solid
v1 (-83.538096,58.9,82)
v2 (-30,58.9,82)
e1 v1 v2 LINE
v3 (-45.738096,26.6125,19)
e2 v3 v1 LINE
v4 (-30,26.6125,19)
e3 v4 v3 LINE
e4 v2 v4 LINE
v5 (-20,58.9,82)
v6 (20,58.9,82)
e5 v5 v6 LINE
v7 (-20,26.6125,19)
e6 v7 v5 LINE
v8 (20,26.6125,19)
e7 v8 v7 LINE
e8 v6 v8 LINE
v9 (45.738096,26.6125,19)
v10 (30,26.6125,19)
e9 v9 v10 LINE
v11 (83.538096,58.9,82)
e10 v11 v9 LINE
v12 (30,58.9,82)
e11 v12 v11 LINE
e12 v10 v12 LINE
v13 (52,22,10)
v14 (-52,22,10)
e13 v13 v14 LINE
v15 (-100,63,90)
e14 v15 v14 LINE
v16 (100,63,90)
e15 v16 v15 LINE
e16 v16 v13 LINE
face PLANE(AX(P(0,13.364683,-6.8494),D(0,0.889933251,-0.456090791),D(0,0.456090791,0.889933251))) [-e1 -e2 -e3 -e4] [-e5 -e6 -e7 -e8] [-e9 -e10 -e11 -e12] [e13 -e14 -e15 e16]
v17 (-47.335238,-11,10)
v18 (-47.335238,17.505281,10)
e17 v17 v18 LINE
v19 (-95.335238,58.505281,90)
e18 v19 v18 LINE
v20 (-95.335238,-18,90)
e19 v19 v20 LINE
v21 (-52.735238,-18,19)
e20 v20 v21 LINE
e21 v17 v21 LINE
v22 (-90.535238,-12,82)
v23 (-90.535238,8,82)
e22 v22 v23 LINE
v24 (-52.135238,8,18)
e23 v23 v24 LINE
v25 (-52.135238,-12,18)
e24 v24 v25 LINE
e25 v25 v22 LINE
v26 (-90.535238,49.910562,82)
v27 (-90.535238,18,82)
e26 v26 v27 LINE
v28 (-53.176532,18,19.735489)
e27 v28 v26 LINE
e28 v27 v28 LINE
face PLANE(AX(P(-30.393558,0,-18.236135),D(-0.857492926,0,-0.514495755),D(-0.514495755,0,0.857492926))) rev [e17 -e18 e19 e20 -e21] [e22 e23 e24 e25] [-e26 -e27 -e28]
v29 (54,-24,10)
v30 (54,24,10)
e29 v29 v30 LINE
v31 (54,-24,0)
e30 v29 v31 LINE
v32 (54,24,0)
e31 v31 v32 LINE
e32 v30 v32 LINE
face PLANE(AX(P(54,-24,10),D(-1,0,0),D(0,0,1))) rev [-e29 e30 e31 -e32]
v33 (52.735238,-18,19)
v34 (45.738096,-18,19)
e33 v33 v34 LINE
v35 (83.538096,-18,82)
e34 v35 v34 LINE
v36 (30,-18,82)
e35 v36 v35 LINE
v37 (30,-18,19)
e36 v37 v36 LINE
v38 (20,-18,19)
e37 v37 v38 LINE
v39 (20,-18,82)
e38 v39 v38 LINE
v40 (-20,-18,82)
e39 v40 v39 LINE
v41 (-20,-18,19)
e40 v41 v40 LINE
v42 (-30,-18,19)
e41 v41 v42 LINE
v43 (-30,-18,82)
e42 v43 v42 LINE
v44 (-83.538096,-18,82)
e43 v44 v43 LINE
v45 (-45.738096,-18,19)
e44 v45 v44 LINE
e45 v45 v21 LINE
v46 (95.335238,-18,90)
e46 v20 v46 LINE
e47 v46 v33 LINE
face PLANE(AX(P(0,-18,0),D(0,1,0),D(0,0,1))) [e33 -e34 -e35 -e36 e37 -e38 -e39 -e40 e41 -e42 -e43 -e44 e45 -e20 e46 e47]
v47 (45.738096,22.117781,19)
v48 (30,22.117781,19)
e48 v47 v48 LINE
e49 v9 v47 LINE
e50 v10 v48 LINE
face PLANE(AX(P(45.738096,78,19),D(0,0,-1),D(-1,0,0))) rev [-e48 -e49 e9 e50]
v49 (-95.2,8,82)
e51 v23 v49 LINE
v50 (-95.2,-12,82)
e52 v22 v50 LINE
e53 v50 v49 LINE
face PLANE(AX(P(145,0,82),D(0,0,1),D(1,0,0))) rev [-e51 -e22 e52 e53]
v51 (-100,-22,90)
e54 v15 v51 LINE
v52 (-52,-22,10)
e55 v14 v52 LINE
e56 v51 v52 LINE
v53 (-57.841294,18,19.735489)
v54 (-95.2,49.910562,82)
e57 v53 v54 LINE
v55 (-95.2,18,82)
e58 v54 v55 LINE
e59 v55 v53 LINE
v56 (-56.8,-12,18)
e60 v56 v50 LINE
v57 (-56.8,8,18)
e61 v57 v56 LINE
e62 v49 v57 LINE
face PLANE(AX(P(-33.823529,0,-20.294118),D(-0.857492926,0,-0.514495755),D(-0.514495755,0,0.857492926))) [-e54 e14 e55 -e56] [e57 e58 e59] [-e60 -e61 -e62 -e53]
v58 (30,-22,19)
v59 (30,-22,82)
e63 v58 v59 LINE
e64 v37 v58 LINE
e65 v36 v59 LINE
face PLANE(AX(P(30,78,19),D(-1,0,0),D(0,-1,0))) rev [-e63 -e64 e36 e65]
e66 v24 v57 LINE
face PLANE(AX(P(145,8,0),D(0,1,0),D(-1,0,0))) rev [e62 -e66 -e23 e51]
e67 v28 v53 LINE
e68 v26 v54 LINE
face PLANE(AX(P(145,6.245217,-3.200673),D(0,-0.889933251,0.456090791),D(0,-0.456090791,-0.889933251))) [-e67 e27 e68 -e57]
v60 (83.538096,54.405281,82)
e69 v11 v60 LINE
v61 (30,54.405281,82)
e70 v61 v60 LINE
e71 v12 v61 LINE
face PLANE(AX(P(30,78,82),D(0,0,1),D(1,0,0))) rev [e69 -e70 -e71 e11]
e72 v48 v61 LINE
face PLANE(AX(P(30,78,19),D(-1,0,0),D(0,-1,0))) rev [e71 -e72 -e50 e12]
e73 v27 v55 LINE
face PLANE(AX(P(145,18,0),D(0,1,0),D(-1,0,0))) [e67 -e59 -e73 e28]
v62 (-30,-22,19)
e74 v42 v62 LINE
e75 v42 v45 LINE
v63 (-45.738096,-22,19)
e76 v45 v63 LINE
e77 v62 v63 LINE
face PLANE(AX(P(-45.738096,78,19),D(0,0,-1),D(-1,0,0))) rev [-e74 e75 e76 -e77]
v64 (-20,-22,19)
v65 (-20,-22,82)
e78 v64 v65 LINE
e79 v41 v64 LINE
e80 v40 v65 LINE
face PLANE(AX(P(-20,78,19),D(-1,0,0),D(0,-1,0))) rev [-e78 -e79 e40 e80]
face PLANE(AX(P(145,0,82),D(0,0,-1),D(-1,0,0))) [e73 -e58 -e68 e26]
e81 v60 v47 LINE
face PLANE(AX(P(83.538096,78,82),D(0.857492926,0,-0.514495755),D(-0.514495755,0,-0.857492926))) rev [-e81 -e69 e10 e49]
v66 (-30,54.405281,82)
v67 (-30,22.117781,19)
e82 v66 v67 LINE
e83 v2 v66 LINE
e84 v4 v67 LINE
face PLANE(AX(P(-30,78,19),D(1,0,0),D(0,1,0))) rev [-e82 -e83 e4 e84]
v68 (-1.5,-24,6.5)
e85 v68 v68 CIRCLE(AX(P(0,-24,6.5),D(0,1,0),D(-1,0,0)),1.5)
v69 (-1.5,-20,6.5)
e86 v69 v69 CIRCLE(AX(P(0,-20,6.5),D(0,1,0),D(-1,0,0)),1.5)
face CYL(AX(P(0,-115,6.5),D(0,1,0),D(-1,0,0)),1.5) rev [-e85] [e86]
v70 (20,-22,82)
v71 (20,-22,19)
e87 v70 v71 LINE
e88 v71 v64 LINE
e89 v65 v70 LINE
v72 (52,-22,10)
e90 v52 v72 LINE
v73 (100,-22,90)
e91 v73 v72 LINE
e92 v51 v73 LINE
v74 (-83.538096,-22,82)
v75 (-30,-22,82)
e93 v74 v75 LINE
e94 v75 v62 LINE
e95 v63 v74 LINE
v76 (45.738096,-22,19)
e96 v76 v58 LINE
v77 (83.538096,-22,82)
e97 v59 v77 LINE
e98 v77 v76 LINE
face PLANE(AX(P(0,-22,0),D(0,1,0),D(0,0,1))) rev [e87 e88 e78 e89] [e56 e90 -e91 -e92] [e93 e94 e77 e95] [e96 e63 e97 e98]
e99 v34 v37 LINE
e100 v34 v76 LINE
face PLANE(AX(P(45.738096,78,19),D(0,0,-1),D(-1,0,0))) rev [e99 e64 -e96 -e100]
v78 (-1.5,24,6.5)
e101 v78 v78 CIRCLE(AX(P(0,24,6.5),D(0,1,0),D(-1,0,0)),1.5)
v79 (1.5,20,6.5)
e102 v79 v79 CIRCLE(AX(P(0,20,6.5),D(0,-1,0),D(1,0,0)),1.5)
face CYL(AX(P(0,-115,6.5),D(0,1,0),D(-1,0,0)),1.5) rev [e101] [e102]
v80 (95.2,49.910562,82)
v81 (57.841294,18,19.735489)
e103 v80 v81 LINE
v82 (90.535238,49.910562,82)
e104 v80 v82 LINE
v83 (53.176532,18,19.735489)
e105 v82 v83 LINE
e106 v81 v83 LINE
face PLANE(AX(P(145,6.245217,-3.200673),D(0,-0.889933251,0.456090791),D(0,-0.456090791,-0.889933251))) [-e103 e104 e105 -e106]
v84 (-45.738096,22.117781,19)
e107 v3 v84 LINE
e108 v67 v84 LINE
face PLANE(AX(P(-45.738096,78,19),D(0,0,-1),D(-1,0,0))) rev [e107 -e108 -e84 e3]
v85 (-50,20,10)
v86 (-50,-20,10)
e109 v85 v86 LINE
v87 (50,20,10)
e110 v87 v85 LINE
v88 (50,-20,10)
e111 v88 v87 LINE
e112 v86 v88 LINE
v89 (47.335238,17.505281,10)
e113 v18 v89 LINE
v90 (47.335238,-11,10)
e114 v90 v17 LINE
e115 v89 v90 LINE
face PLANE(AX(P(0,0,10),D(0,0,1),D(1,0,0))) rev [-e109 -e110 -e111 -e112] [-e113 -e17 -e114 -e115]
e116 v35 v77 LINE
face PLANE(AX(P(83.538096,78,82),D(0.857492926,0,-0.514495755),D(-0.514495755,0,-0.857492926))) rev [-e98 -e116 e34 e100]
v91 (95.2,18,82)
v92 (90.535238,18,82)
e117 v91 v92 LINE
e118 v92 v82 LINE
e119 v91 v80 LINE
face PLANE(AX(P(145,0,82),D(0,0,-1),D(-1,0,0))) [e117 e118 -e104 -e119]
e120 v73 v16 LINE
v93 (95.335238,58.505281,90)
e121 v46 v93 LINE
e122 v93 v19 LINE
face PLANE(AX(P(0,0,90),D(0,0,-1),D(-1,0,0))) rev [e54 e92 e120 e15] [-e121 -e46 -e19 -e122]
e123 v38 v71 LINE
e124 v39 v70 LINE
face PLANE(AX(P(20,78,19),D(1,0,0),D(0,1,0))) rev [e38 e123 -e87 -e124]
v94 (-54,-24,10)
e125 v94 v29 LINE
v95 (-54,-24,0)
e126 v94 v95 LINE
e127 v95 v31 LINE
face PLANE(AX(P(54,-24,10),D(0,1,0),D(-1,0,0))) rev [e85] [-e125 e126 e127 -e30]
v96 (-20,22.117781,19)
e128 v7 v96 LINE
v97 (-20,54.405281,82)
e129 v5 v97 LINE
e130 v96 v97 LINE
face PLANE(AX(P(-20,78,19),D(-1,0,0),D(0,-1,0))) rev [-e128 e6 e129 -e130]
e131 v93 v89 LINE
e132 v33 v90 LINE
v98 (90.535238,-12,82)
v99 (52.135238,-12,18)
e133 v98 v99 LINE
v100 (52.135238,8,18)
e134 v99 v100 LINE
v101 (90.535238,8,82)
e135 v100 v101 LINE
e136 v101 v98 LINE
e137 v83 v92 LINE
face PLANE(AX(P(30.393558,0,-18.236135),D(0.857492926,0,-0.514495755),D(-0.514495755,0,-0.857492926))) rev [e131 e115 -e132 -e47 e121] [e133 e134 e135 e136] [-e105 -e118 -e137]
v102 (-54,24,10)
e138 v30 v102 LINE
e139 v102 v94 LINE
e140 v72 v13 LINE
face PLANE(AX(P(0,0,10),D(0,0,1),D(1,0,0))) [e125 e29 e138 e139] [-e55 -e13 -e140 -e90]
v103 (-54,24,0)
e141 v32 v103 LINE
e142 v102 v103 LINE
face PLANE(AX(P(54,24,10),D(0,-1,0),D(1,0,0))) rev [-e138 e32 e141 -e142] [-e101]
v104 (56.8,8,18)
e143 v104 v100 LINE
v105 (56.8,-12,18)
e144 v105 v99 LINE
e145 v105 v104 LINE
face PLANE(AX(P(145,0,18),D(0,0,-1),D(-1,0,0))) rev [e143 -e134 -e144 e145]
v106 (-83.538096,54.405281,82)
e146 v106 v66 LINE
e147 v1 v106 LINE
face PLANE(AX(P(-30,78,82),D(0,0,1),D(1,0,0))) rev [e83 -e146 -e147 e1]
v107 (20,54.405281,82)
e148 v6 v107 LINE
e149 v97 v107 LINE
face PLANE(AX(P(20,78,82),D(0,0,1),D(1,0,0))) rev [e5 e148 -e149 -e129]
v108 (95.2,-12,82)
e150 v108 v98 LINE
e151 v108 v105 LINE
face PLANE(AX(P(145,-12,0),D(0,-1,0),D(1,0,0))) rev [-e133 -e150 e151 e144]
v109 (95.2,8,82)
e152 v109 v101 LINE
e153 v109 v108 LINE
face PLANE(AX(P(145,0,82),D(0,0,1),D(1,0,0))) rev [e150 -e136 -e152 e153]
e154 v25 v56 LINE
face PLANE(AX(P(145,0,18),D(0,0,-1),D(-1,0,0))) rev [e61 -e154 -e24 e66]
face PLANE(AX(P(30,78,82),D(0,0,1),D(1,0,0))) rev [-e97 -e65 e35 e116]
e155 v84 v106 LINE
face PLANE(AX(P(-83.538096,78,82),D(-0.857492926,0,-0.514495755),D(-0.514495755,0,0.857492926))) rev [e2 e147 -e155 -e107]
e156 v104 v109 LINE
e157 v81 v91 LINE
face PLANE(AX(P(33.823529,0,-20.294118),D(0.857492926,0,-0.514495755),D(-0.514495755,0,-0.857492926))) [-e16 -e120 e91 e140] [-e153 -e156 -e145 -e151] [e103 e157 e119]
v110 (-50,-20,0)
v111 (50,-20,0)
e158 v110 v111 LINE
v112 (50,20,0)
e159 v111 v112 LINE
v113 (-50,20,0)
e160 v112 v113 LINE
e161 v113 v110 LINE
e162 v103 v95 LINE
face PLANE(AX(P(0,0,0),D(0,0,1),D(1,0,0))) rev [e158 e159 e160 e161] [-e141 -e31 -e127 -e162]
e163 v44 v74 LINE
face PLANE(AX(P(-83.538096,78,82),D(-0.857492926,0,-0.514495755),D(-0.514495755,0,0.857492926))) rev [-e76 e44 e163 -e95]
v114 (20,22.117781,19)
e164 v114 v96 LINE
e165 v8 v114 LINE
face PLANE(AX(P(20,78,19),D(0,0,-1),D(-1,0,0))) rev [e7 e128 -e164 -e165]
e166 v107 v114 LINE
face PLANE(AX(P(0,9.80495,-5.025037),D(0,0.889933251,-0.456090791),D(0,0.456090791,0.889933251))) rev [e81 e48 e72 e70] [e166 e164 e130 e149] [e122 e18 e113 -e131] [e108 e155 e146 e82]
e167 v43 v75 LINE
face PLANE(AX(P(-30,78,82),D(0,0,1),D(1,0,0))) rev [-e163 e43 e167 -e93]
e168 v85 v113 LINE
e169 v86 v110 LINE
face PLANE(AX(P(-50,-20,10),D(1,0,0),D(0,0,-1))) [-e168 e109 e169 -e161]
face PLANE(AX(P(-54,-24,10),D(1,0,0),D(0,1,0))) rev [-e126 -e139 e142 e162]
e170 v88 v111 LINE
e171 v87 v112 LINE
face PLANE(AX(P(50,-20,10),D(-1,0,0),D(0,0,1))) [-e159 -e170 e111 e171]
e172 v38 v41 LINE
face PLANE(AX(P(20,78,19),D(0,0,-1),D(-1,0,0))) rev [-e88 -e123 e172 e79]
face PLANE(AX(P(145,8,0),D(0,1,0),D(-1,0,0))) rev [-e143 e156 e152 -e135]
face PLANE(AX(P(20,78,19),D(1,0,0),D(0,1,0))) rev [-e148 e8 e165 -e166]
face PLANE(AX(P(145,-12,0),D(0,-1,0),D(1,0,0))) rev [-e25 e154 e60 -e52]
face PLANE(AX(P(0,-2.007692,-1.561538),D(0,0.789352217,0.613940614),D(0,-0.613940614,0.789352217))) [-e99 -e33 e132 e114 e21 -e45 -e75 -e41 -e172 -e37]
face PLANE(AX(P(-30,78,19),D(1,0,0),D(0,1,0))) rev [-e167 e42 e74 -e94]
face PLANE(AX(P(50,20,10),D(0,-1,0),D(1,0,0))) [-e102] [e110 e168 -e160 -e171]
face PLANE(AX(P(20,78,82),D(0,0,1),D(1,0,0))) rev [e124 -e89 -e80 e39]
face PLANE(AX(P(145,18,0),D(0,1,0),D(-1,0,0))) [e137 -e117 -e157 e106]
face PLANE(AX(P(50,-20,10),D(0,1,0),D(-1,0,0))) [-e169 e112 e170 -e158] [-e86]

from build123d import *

# Parameters (mm, degrees)
SKETCH_1_W          = 108
SKETCH_1_H          = 48
SKETCH_1_W_2        = 100
SKETCH_1_H_2        = 40
EXTRUDE_1_DEPTH     = 10
SKETCH_6_W          = 40
SKETCH_6_H          = 63
CUT_EXTRUDE_1_DEPTH = 102
SKETCH_7_W          = 64
SKETCH_7_H          = 20
CUT_EXTRUDE_2_DEPTH = 199
SKETCH_8_R          = 1.5
CUT_EXTRUDE_3_DEPTH = 139


with BuildPart() as part:
    # 草图1 → 凸台-拉伸1 (new body)
    with BuildSketch(Plane.XY):
        Rectangle(SKETCH_1_W, SKETCH_1_H)
        Rectangle(SKETCH_1_W_2, SKETCH_1_H_2, mode=Mode.SUBTRACT)
    extrude(amount=EXTRUDE_1_DEPTH)

    # 草图5 → 放样3 section 0
    with BuildSketch(Plane.XY.offset(90)):
        with BuildLine():
            Line((-100, -22), (100, -22))
            Line((100, -22), (100, 63))
            Line((100, 63), (-100, 63))
            Line((-100, 63), (-100, -22))
        make_face()
    # 草图2 → 放样3 section 1
    with BuildSketch(Plane.XY.offset(10)):
        with BuildLine():
            Line((52, 22), (-52, 22))
            Line((-52, 22), (-52, -22))
            Line((-52, -22), (52, -22))
            Line((52, -22), (52, 22))
        make_face()
    loft()

    # 抽壳2: read off the stored shape, not the designer's step
    # 抽壳2: loft between two sections, ruled curve by curve
    shell_2_from = [
        Edge.make_line((95.335238484, -18, 90), (95.335238484, 58.505280876, 90)),
        Edge.make_line((95.335238484, 58.505280876, 90), (-95.335238484, 58.505280876, 90)),
        Edge.make_line((-95.335238484, -18, 90), (95.335238484, -18, 90)),
        Edge.make_line((-95.335238484, 58.505280876, 90), (-95.335238484, -18, 90)),
    ]
    shell_2_to = [
        Edge.make_line((47.335238484, -18, 10), (47.335238484, 17.505280876, 10)),
        Edge.make_line((47.335238484, 17.505280876, 10), (-47.335238484, 17.505280876, 10)),
        Edge.make_line((-47.335238484, -18, 10), (47.335238484, -18, 10)),
        Edge.make_line((-47.335238484, 17.505280876, 10), (-47.335238484, -18, 10)),
    ]
    shell_2 = Solid(Shell([*[Face.make_surface_from_curves(shell_2_from[k], shell_2_to[k]) for k in range(4)], Face(Wire(shell_2_from)), Face(Wire(shell_2_to))]))
    add(shell_2, mode=Mode.SUBTRACT)

    # 草图6 → 切除-拉伸1 (cut)
    with BuildSketch(Plane.XZ.offset(24)):
        with Locations((0, 50.5)):
            Rectangle(SKETCH_6_W, SKETCH_6_H)
        Polygon((30, 19), (30, 82), (83.53809621, 82), (45.73809621, 19), align=None)
        Polygon((-45.73809621, 19), (-30, 19), (-30, 82), (-83.53809621, 82), align=None)
    extrude(amount=-CUT_EXTRUDE_1_DEPTH, mode=Mode.SUBTRACT)

    # 草图7 → 切除-拉伸2 (cut, symmetric)
    with BuildSketch(Plane.ZY.offset(54)):
        with Locations((50, -2)):
            Rectangle(SKETCH_7_W, SKETCH_7_H)
        Polygon((82, 49.910561753), (19.735489263, 18), (82, 18), align=None)
    extrude(amount=CUT_EXTRUDE_2_DEPTH, both=True, mode=Mode.SUBTRACT)

    # 草图8 → 切除-拉伸3 (cut)
    with BuildSketch(Plane(origin=(0, 24, 0), x_dir=(1, 0, 0), z_dir=(0, 1, 0))):
        with Locations(Location((0, -6.5, 0), (0, 0, 180))):
            Circle(SKETCH_8_R)
    extrude(amount=-CUT_EXTRUDE_3_DEPTH, mode=Mode.SUBTRACT)

    # 草图13 → 放样5 section 0
    with BuildSketch(Plane(origin=(30.393557709, 0, -18.236134625), x_dir=(0.5144957554275269, 0, 0.857492925712544), z_dir=(-0.857492925712544, 0, 0.5144957554275269))):
        with BuildLine():
            Line((32.928708539, -11), (43.42442195, -18))
            Line((43.42442195, -18), (32.928708539, -18))
            Line((32.928708539, -18), (32.928708539, -11))
        make_face()
    # 草图12 → 放样5 section 1
    with BuildSketch(Plane(origin=(-30.393557709, 0, -18.236134625), x_dir=(0.5144957554275263, 0, -0.8574929257125443), z_dir=(0.8574929257125443, 0, 0.5144957554275263))):
        with BuildLine():
            Line((-32.928708539, -11), (-43.42442195, -18))
            Line((-43.42442195, -18), (-32.928708539, -18))
            Line((-32.928708539, -18), (-32.928708539, -11))
        make_face()
    loft()


solid = part.part
